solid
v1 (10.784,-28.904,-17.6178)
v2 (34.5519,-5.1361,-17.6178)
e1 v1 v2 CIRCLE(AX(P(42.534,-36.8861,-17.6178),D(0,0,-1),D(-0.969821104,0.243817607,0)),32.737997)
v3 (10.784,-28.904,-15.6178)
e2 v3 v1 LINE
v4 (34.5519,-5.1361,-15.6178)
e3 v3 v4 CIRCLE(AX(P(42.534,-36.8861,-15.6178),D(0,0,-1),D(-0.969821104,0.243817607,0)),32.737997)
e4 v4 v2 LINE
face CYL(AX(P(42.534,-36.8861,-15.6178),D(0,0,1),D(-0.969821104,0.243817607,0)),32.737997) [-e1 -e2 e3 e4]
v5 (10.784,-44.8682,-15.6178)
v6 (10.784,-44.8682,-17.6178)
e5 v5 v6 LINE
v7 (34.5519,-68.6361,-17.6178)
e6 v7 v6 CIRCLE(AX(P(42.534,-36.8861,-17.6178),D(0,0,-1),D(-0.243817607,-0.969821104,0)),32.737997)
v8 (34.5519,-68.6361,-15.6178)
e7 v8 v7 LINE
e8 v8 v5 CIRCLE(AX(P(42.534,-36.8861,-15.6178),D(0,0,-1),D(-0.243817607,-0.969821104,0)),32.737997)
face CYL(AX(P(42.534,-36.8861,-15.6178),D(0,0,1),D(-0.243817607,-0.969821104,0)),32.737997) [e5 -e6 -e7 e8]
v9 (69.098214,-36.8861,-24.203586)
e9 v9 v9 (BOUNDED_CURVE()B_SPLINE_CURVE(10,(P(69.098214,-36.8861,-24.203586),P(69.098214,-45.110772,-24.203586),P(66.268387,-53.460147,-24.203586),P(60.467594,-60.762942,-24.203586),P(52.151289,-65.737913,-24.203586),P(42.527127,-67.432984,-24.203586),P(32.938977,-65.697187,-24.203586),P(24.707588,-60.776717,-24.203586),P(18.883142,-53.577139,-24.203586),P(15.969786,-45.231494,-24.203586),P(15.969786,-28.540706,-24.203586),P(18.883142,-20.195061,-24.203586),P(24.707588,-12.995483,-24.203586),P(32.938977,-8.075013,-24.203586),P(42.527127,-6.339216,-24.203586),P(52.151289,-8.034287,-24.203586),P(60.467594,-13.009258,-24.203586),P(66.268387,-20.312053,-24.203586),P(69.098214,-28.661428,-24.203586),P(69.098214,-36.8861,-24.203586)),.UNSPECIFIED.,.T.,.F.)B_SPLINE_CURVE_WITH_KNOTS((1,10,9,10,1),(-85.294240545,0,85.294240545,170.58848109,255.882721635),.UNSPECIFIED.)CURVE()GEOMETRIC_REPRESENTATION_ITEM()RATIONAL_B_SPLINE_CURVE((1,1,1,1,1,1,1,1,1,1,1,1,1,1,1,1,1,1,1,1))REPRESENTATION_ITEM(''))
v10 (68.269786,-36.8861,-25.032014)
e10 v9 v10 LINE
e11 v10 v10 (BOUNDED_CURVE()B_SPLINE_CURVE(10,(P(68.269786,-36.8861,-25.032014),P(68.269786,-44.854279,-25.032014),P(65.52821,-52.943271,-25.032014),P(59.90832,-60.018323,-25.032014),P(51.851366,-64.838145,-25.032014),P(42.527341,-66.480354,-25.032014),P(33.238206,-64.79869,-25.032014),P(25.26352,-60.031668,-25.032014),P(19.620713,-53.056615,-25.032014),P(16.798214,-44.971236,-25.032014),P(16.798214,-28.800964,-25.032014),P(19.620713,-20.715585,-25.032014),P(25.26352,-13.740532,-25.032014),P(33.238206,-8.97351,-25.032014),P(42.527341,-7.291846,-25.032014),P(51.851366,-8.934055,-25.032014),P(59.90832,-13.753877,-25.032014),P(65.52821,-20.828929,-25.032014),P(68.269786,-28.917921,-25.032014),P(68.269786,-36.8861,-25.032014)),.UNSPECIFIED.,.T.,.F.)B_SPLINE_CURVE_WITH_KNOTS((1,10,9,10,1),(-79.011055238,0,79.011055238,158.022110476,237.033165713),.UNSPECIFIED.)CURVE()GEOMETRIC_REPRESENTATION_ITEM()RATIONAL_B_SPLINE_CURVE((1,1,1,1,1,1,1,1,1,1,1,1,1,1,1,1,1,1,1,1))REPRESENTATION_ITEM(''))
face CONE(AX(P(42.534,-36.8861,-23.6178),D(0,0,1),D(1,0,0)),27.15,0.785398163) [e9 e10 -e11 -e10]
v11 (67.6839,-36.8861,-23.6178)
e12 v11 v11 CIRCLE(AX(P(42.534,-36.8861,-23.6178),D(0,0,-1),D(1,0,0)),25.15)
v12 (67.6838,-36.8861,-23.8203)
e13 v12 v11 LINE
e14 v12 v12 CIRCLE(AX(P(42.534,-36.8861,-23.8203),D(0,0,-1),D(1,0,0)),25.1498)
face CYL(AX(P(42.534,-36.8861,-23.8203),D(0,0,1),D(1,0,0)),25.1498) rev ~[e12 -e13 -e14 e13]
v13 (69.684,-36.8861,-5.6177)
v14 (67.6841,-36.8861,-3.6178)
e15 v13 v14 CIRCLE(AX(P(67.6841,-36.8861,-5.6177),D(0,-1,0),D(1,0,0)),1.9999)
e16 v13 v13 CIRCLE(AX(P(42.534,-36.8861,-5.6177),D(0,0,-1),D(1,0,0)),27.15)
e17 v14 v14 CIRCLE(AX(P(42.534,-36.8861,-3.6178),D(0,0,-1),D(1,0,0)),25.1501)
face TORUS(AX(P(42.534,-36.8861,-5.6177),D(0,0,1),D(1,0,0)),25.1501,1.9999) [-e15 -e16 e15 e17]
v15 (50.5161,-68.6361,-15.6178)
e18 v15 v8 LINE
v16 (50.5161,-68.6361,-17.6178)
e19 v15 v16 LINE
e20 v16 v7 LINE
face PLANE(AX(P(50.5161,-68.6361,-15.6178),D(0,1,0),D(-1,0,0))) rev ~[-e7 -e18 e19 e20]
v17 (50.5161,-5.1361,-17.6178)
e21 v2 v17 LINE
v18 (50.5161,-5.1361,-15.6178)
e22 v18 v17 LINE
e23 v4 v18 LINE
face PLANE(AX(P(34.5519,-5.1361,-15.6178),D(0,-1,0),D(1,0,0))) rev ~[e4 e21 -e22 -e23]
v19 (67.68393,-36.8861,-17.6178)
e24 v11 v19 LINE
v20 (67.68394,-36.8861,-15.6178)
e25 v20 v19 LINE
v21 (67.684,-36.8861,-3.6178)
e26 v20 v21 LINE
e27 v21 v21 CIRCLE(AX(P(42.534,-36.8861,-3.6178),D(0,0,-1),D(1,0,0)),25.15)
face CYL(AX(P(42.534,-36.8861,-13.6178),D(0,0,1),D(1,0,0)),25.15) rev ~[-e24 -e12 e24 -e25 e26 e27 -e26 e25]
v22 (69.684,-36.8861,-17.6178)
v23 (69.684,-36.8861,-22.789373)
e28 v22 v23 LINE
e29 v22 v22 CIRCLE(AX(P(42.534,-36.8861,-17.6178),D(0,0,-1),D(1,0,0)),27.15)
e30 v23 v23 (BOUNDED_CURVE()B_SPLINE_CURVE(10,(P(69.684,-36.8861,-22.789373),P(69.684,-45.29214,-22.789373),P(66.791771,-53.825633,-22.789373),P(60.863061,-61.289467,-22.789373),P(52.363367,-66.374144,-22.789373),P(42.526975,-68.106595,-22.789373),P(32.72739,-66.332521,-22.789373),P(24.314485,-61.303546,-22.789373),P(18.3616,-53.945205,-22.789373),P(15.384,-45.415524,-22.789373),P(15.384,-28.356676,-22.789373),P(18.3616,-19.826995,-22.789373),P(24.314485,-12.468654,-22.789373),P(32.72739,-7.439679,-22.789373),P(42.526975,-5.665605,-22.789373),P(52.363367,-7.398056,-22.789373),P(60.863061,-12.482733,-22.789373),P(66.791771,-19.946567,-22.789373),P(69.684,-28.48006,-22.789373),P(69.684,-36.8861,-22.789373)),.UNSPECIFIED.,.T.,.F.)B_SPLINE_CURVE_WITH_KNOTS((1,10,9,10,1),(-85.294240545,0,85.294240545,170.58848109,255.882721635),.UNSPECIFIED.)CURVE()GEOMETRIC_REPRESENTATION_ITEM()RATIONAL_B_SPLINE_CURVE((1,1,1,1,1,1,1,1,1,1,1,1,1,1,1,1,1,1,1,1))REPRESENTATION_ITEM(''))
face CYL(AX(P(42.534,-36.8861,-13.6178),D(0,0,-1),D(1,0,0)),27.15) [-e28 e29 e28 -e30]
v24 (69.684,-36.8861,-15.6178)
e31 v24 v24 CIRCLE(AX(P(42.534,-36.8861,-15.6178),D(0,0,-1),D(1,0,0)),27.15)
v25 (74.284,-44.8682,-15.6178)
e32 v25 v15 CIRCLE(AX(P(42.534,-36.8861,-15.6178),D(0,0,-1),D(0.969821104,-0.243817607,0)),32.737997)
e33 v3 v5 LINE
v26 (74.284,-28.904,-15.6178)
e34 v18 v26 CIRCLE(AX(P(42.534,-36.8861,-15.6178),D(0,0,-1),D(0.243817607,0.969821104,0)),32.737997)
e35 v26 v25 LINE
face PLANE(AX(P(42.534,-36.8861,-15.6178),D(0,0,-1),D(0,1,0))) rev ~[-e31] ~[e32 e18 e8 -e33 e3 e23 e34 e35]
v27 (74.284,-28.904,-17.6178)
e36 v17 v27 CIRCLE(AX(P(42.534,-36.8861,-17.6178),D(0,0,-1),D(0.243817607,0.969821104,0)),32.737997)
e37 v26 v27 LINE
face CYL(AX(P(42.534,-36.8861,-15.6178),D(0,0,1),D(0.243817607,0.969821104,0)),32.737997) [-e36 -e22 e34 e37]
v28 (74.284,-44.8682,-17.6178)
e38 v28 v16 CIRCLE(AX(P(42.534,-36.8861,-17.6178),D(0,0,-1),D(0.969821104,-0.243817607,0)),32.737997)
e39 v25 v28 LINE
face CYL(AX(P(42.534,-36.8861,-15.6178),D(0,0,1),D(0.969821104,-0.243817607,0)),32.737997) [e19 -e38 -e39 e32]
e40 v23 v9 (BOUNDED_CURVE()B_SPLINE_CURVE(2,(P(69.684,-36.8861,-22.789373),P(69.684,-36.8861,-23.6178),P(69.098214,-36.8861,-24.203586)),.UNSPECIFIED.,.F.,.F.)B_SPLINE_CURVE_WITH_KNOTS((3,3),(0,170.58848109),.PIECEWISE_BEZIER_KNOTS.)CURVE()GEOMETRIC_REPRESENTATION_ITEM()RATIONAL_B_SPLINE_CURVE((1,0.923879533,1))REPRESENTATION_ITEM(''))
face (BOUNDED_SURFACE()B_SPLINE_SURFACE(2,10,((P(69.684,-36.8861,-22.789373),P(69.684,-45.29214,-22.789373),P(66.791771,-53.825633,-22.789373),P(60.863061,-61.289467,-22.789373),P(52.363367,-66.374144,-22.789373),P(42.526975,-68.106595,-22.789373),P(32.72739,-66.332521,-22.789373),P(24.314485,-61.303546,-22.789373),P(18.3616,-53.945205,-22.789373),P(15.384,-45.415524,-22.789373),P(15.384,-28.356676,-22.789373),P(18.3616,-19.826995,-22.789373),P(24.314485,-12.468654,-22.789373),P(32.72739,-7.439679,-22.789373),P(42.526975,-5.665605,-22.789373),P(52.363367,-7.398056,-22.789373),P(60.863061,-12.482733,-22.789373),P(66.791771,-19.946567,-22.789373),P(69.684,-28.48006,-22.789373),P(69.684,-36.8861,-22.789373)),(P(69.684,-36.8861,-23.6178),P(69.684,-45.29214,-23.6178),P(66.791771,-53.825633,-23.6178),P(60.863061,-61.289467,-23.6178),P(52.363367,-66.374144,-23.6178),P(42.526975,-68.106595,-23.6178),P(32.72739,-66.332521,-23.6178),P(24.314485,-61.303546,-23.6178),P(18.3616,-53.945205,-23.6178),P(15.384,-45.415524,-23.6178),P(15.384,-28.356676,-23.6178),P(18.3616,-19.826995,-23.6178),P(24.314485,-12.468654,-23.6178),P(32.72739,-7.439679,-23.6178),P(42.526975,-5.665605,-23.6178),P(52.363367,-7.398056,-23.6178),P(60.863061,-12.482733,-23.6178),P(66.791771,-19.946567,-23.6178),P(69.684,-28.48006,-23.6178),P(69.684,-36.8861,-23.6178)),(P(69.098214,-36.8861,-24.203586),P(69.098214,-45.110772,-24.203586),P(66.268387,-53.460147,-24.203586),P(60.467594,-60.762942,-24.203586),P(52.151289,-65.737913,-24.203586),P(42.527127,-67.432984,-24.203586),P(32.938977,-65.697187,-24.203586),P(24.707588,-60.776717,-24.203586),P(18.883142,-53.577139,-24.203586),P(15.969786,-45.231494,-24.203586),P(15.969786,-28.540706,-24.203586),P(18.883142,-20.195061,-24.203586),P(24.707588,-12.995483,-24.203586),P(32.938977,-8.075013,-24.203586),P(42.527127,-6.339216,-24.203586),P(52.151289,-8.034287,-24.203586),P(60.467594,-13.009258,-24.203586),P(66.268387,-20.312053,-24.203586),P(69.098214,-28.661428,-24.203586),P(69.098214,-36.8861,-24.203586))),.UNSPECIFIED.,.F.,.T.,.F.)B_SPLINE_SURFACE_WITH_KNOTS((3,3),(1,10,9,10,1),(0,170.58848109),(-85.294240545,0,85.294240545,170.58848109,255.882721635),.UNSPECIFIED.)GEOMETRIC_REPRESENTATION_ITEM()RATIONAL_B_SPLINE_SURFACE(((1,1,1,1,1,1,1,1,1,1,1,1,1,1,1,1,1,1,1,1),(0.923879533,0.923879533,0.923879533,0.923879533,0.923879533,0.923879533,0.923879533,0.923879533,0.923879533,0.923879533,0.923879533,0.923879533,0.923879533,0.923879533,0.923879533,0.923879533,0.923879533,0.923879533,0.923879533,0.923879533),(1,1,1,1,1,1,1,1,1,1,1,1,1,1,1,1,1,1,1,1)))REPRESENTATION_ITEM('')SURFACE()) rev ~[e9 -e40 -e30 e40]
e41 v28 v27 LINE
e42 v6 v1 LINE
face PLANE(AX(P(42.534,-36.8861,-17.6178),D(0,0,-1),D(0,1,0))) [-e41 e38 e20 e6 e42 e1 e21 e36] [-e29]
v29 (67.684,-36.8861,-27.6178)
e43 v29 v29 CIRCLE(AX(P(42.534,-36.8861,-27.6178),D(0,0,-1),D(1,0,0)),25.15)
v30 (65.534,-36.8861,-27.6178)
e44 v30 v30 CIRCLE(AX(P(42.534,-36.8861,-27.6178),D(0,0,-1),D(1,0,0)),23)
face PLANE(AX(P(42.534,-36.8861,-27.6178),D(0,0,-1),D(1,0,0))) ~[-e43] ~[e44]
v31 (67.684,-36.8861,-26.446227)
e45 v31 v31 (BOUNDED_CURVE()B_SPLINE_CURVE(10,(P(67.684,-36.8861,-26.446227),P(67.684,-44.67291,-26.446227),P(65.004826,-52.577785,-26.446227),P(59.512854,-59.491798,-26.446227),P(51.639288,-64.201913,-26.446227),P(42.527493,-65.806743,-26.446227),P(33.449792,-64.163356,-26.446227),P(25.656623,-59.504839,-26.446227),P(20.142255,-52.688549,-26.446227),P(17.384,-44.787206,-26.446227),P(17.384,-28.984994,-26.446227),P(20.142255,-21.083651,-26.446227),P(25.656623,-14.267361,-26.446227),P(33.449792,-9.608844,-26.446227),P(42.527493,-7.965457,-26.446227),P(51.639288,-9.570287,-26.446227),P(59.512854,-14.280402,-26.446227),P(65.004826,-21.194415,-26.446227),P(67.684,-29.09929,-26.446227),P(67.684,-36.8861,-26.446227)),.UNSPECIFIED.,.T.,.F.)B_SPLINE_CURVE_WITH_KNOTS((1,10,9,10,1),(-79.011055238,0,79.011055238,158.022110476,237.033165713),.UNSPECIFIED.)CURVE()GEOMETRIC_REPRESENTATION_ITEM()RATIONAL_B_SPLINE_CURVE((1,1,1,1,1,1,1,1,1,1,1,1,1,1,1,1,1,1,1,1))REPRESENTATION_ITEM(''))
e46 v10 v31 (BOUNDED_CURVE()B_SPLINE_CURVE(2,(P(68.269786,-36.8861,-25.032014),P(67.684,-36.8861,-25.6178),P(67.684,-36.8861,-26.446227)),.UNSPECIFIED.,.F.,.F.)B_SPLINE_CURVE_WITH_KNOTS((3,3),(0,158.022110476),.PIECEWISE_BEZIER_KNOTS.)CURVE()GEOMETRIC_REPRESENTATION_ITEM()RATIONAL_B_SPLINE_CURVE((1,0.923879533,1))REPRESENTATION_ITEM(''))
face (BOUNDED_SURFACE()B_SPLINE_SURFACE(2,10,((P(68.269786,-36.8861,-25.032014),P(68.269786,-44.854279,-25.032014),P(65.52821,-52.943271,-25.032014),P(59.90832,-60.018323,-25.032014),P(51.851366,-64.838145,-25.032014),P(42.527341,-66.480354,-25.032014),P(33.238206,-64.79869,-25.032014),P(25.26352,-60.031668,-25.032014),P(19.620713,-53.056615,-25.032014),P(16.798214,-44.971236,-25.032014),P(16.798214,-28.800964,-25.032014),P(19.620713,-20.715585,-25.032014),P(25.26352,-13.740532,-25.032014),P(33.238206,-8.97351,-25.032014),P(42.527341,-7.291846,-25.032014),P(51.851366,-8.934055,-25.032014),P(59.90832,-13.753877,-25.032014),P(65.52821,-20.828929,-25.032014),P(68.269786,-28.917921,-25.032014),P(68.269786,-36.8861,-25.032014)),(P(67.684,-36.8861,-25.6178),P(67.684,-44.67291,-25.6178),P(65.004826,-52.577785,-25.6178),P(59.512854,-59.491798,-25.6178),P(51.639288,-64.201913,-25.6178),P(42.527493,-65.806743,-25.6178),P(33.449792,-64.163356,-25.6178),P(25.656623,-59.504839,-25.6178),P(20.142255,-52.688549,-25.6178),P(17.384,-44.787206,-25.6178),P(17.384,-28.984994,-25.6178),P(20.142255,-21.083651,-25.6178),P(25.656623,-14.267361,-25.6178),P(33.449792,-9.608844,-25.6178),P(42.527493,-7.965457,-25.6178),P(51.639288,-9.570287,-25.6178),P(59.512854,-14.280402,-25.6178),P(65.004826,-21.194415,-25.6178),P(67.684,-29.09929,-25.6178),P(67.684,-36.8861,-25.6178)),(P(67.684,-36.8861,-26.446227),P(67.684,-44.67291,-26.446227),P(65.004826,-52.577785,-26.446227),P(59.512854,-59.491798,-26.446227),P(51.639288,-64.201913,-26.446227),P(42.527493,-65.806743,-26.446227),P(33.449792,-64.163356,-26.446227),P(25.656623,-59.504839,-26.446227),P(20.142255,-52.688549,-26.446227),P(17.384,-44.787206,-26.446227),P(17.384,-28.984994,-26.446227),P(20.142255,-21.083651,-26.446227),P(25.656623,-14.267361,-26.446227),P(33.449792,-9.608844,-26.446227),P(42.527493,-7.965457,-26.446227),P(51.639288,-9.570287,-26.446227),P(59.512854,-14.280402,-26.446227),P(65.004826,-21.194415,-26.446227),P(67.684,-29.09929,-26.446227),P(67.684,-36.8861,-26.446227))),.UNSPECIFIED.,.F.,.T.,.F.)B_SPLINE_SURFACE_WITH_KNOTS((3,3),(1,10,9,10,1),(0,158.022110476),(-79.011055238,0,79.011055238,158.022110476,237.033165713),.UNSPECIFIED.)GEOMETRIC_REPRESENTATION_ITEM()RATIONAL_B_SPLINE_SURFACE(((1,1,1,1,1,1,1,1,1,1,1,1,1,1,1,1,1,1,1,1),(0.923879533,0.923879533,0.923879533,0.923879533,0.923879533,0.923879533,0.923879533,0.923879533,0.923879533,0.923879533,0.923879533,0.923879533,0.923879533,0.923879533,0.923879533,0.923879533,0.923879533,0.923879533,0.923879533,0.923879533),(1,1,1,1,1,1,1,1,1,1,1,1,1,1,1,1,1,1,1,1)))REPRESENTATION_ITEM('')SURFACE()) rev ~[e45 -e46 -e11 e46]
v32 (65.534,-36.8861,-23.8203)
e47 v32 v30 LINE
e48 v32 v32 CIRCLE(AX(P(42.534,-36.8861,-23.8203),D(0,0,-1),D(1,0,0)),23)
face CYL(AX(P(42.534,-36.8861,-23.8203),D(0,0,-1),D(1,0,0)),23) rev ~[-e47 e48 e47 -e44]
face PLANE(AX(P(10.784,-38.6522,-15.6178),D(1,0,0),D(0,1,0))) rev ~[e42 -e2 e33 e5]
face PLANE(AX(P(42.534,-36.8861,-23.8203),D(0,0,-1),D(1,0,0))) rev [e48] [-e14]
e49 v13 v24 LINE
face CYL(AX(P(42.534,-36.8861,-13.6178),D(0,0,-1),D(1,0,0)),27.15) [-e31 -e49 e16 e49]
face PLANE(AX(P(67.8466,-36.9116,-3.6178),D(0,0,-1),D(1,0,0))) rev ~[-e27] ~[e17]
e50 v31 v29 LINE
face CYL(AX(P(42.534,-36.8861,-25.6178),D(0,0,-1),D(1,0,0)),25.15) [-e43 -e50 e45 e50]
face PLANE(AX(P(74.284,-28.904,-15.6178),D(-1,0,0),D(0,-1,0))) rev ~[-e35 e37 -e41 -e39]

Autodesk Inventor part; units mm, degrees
ref_plane "YZ Plane" through (0, 0, 0) normal (1, 0, 0) x (0, 1, 0)
ref_plane "XZ Plane" through (0, 0, 0) normal (0, 1, 0) x (-1, 0, 0)
ref_plane "XY Plane" through (0, 0, 0) normal (0, 0, 1) x (1, 0, 0)
ref_plane "Work Plane1" through (67.8466, -36.9116, -13.6178) normal (0, 0, -1) x (1, 0, 0)
sketch "Sketch1" plane through (67.8466, -36.9116, -13.6178) normal (0, 0, -1) x (1, 0, 0)
  circle A0 centre (-25.3126, -0.0255) radius 25 projected
  circle A1 centre (-25.3126, -0.0255) radius 25.15
  circle A2 centre (-25.3126, -0.0255) radius 27.15
  point P0 (-67.8466, -36.9116)
  dimension "d8" = 0.15
  dimension "d9" = 2
  dimension "d26" = 54.3
extrude "Extrusion2" add sketch "Sketch1" along normal mid plane 20 contours A2
fillet "Fillet3" radius 2 1 edges at (15.384, -36.8861, -3.6178)
ref_plane "Work Plane3" through (73.8334, -36.8861, -23.6178) normal (0, 1, 0) x (-1, 0, 0)
sketch "Sketch4" plane through (73.8334, -36.8861, -23.6178) normal (0, 1, 0) x (-1, 0, 0)
  line L0 (6.1494, 20) -> (6.1494, 0) construction
  line L1 (56.4494, 20) -> (56.4494, 0) construction
  line L2 (4.1494, 0) -> (6.1494, -2)
  line L3 (6.1494, -2) -> (6.1494, -4)
  line L4 (6.1494, -4) -> (8.1494, -4)
  line L5 (31.2994, 0.6713) -> (31.2994, 28.2514) construction
  line L6 (31.2994, 28.2514) -> (31.2994, -7.4559) construction
  line L7 (8.1494, -0.2025) -> (6.2913, -0.2025)
  line L8 (4.1494, 0) -> (6.1496, 0)
  line L9 (4.1494, 0) -> (6.1494, 0) construction
  line L10 (6.2911, 0) -> (6.9778, 0) construction
  line L11 (6.2913, -0.2025) -> (6.1496, -0.2025)
  line L12 (6.1496, -0.2025) -> (6.1496, 0)
  line L13 (8.2994, -0.2025) -> (8.2994, 19.7975) construction
  line L14 (8.1494, -0.2025) -> (8.2994, -0.2025)
  line L15 (8.2994, -0.2025) -> (8.2994, -4)
  line L16 (8.2994, -4) -> (8.1494, -4)
  point P0 (73.8334, 23.6178)
  dimension "d18" = 2
revolve "Revolution1" add sketch "Sketch4" angle 360 about axis through (42.534, -36.8861, 4.6336) along (0, 0, -1)
fillet "Fillet5" radius 2 2 edges at (17.384, -36.8861, -25.6178) (15.384, -36.8861, -23.6178)
ref_plane "Work Plane12" through (42.534, -36.8861, -15.6178) normal (0, 0, -1) x (0, 1, 0)
sketch "Sketch6" plane through (42.534, -36.8861, -15.6178) normal (0, 0, -1) x (0, 1, 0)
  line L0 (5, 31.75) -> (-5, 31.75)
  line L1 (31.75, -7.9821) -> (31.75, 7.9821)
  line L2 (7.9821, 31.75) -> (-7.9821, 31.75)
  line L3 (-31.75, 7.9821) -> (-31.75, -7.9821)
  line L4 (-7.9821, -31.75) -> (7.9821, -31.75)
  arc A0 (-31.75, -7.9821) -> (-7.9821, -31.75) centre (0, 0) ccw
  arc A1 (-7.9821, 31.75) -> (-31.75, 7.9821) centre (0, 0) ccw
  arc A2 (7.9821, -31.75) -> (31.75, -7.9821) centre (0, 0) ccw
  arc A3 (31.75, 7.9821) -> (7.9821, 31.75) centre (0, 0) ccw
  line L5 (-1.7661, -31.75) -> (7.9821, -31.75)
  arc A4 (-7.9821, 31.75) -> (-31.75, 7.9821) centre (0, 0) ccw
  arc A5 (-31.75, -7.9821) -> (-7.9821, -31.75) centre (0, 0) ccw
  arc A6 (7.9821, -31.75) -> (31.75, -7.9821) centre (0, 0) ccw
  arc A7 (31.75, 7.9821) -> (7.9821, 31.75) centre (0, 0) ccw
extrude "Extrusion4" add sketch "Sketch6" along normal blind 2
sketch "Sketch7" plane through (42.534, -36.8861, -27.6178) normal (0, 0, -1) x (-1, 0, 0)
  circle A0 centre (0, 0) radius 23 construction
  circle A1 centre (0, 0) radius 25.15 construction
  line L0 (0, -40.051) -> (0, 42.9038) construction
  line L1 (-48.7042, 0) -> (50.8727, 0) construction
ref_plane "plano de separación con el cono" through (42.534, -36.8861, -28.0178) normal (0, 0, -1) x (-1, 0, 0)
sketch "Sketch8" plane through (42.534, -36.8861, -15.6178) normal (0, 0, 1) x (1, 0, 0)
  circle A0 centre (0, 0) radius 25.15 projected
  point P0 (-42.534, 36.8861)
extrude "Extrusion5" cut sketch "Sketch8" against normal up to surface (2 mm away)
equation "\"d8\" = HOLE_TOLERANCE"
equation "\"HOLE_TOLERANCE\" = 0.15"
properties part number "adaptador_cono" material "PET Plastic"
